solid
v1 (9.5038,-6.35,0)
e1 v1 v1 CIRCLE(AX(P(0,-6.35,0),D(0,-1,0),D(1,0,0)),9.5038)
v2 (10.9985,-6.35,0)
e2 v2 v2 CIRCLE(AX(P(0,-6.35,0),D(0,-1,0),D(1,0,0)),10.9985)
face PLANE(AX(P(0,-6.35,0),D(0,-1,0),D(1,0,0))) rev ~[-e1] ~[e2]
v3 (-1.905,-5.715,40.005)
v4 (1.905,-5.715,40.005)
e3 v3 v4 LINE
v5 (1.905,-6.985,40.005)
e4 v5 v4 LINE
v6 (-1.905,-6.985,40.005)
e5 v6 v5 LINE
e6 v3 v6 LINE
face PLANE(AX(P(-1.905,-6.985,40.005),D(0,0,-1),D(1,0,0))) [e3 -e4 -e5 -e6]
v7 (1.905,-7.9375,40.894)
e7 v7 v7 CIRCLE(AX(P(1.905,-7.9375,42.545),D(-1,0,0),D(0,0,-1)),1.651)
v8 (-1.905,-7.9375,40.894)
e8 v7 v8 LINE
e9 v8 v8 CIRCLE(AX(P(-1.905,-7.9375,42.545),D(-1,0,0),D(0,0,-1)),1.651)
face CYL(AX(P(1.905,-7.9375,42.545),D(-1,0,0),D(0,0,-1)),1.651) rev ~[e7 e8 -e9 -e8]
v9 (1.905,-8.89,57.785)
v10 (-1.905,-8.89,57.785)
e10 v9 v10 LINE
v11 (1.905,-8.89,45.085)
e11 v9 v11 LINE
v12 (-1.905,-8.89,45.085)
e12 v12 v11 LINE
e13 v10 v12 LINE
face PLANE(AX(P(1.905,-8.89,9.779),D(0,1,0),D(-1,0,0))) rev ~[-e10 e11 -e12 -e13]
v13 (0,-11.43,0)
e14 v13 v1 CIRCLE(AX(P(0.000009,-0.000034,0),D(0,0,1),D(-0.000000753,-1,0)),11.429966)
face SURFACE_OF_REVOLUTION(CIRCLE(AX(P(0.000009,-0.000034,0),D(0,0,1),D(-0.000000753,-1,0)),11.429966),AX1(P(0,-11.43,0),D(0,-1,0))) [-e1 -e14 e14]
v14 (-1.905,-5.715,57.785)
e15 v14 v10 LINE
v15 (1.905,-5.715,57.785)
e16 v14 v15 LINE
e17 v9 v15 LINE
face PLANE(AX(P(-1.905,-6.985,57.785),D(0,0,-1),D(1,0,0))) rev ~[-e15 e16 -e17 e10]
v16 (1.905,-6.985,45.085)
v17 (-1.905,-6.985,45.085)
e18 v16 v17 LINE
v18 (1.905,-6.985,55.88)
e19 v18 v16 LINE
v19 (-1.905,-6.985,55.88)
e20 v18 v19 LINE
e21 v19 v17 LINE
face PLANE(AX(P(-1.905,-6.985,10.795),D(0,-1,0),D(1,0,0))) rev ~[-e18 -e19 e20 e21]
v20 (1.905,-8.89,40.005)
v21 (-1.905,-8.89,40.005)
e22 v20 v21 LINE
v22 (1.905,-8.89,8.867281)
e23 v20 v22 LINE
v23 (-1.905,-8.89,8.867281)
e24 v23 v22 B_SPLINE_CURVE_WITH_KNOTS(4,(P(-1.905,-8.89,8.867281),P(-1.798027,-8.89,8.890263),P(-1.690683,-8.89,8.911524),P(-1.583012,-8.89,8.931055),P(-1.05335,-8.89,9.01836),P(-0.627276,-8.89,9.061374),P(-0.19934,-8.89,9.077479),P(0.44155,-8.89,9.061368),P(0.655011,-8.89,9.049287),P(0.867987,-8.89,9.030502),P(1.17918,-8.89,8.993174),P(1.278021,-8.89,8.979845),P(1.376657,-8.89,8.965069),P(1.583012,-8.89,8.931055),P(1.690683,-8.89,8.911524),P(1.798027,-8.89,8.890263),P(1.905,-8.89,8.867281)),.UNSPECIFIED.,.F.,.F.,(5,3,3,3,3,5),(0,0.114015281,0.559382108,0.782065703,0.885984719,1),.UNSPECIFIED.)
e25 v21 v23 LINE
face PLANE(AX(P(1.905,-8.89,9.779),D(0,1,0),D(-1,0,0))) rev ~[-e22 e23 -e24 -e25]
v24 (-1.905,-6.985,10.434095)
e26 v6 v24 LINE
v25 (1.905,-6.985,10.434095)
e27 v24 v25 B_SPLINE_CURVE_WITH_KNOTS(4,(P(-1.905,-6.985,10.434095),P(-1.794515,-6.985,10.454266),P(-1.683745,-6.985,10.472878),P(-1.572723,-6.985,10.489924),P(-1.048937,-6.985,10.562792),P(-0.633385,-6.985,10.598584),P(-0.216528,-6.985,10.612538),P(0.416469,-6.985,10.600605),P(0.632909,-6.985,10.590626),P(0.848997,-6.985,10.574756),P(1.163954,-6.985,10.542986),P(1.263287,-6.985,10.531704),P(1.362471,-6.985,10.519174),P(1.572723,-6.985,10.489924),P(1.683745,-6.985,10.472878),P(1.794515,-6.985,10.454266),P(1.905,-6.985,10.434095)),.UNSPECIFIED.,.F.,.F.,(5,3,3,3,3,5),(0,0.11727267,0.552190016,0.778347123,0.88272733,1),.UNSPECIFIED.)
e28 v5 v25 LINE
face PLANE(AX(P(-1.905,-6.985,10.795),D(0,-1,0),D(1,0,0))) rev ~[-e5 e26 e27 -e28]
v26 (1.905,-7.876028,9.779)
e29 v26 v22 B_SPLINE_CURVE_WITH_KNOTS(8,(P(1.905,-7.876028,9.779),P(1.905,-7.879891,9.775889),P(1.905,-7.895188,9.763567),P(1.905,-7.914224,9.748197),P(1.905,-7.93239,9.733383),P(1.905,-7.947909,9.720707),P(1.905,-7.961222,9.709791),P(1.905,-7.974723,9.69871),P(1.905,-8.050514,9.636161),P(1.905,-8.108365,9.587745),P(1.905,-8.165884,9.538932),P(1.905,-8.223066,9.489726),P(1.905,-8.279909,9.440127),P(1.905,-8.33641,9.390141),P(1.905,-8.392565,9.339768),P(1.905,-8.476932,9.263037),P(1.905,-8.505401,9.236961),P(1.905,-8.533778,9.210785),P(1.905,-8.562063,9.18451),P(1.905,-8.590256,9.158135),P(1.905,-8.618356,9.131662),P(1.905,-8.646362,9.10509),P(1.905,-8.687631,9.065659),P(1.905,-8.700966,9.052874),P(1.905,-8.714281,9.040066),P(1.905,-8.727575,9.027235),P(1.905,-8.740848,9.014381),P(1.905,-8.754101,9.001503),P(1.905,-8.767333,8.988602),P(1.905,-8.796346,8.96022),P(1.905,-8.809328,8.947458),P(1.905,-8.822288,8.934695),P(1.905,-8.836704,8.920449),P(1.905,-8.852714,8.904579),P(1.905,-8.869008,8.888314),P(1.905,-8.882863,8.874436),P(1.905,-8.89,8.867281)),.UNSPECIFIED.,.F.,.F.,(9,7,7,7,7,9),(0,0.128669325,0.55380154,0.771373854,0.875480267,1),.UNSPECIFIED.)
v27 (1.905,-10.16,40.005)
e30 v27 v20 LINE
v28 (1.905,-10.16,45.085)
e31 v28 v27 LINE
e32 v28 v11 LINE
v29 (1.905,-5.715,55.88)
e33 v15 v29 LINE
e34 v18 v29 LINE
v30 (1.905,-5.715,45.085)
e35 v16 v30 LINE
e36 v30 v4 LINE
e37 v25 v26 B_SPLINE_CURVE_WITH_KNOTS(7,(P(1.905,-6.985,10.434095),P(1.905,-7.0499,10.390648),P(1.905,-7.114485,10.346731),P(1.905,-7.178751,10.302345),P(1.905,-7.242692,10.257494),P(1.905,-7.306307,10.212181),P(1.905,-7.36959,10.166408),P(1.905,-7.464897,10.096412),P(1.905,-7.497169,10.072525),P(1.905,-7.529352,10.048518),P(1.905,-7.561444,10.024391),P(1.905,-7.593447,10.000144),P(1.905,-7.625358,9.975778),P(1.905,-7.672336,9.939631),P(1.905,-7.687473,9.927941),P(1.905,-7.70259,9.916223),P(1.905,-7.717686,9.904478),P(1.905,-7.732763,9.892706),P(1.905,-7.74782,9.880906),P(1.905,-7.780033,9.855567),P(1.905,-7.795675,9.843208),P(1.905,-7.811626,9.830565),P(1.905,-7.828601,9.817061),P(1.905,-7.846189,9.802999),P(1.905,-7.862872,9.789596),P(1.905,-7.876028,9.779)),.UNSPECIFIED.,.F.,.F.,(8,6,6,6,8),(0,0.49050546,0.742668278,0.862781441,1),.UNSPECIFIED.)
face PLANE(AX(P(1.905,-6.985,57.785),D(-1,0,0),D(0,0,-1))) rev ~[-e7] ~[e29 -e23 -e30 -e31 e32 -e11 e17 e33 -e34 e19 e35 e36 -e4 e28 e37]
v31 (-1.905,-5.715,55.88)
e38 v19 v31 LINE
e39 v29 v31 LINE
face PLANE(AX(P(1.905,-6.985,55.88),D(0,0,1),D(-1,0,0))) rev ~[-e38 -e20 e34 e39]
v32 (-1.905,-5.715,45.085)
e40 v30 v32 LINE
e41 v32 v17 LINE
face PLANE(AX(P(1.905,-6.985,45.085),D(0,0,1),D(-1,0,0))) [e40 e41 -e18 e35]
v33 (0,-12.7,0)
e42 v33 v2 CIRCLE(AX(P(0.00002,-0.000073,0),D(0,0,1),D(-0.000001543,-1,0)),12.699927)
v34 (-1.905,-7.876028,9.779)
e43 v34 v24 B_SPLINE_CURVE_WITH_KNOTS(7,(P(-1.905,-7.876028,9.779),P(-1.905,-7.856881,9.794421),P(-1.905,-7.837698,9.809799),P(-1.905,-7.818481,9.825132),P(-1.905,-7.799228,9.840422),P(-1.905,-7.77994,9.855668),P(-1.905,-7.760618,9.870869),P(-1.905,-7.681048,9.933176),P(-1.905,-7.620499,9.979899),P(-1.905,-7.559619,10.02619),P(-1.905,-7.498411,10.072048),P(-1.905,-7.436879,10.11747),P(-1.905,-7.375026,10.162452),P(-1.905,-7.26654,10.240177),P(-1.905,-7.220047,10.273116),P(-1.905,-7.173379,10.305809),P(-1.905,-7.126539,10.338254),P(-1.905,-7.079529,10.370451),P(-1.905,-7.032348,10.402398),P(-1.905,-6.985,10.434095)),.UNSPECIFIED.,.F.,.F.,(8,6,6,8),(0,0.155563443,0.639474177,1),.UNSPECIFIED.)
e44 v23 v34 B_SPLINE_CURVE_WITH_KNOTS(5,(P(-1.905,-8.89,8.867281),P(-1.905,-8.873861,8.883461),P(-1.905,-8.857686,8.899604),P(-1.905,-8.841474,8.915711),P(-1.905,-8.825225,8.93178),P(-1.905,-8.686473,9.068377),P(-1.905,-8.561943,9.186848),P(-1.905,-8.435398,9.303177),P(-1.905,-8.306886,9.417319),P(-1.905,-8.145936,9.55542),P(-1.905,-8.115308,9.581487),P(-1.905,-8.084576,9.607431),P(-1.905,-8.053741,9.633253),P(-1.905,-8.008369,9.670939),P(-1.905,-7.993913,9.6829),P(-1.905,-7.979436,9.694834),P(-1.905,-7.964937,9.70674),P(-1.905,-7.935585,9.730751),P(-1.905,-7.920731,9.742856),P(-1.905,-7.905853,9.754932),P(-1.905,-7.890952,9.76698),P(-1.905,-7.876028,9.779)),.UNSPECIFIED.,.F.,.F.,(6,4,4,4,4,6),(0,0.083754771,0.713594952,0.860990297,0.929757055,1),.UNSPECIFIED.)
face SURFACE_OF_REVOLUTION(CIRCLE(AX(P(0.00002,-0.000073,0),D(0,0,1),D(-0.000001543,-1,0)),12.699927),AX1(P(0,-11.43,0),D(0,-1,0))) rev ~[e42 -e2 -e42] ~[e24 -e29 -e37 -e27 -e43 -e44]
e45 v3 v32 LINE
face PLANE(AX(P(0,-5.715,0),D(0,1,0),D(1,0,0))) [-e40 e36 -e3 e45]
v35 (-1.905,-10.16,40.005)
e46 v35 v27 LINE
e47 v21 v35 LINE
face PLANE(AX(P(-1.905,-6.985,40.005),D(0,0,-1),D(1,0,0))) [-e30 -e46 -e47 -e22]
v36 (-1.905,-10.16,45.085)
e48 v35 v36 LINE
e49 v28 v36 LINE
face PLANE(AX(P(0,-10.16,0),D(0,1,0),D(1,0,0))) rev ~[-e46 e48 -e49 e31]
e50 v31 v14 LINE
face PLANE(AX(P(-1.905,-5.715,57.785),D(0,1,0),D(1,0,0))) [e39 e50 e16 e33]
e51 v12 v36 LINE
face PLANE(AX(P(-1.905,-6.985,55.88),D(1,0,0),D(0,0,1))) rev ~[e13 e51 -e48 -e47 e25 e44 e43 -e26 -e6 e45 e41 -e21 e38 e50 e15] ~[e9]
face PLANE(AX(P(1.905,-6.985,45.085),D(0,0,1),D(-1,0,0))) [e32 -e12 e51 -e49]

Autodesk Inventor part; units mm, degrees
ref_plane "YZ Plane" through (0, 0, 0) normal (1, 0, 0) x (0, 1, 0)
ref_plane "XZ Plane" through (0, 0, 0) normal (0, 1, 0) x (-1, 0, 0)
sketch "Sketch2" plane through (0, 0, 0) normal (0, 0, 1) x (1, 0, 0)
  arc A0 (0, -12.7) -> (10.9985, -6.35) centre (0, 0) ccw
  arc A1 (0, -11.43) -> (9.5038, -6.35) centre (0, 0) ccw
  line L0 (0, -11.43) -> (0, -12.7)
  line L1 (10.9985, -6.35) -> (9.5038, -6.35)
  dimension "d4" = 25.4
  dimension "d5" = 22.86
  dimension "d9" = 6.35
  dimension "d10" = 10.9985
revolve "Revolution1" add sketch "Sketch2" angle 360 about axis through (0, -11.43, 0) along (0, -1, 0)
ref_plane "Work Plane1" through (0, 0, 10.795) normal (0, 0, 1) x (1, 0, 0)
sketch "Sketch3" plane through (0, 0, 10.795) normal (0, 0, 1) x (1, 0, 0)
  line L0 (-1.905, -6.985) -> (1.905, -6.985)
  line L1 (1.905, -6.985) -> (1.905, -8.89)
  line L2 (1.905, -8.89) -> (-1.905, -8.89)
  line L3 (-1.905, -8.89) -> (-1.905, -6.985)
  line L4 (-10.9985, -6.35) -> (10.9985, -6.35) projected
  point P0 (0, 0)
  dimension "d12" = 1.905
  dimension "d13" = 1.905
  dimension "d14" = 1.905
  dimension "d15" = 0.635
extrude "Extrusion1" add sketch "Sketch3" along normal blind 46.99
sketch "Sketch4" plane through (0, 0, 10.795) normal (0, 0, -1) x (-1, 0, 0)
  line L0 (1.905, -6.985) -> (-1.905, -6.985) projected
  line L1 (-1.905, -6.985) -> (-1.905, -8.89) projected
  line L2 (-1.905, -8.89) -> (1.905, -8.89) projected
  line L3 (1.905, -8.89) -> (1.905, -6.985) projected
  point P0 (0, 0)
extrude "Extrusion2" add sketch "Sketch4" along normal blind 1.016
sketch "Sketch5" plane through (0, 0, 9.779) normal (0, 0, -1) x (-1, 0, 0)
  line L0 (-1.905, -8.89) -> (1.905, -8.89)
  line L1 (1.905, -8.89) -> (1.905, -7.876)
  line L2 (1.905, -7.876) -> (-1.905, -7.876)
  line L3 (-1.905, -7.876) -> (-1.905, -8.89)
  point P0 (0, 0)
extrude "Extrusion3" add sketch "Sketch5" along normal blind 1.016
sketch "Sketch6" plane through (1.905, -8.89, 57.785) normal (1, 0, 0) x (0, 0, -1)
  line L0 (0, 1.905) -> (47.3509, 1.905) projected
  line L1 (0, 0) -> (0, 1.905) projected
  point P0 (57.785, 8.89)
  point P1 (15.24, 0.9525)
  dimension "d24" = 0.9525
  dimension "d25" = 15.24
sketch "Sketch7" plane through (0, -6.985, 0) normal (0, 1, 0) x (1, 0, 0)
  line L0 (1.905, -57.785) -> (1.905, -8.8673) projected
  line L1 (-1.905, -10.4341) -> (-1.905, -57.785) projected
  line L2 (1.905, -45.085) -> (-1.905, -45.085)
  line L3 (-1.905, -45.085) -> (-1.905, -40.005)
  line L4 (-1.905, -40.005) -> (1.905, -40.005)
  line L5 (1.905, -40.005) -> (1.905, -45.085)
  line L6 (-9.5339, -42.545) -> (17.5873, -42.545) construction
  line L7 (1.905, -57.785) -> (-1.905, -57.785) construction
  point P0 (0, 0)
  dimension "d26" = 15.24
  dimension "d27" = 2.54
  dimension "d28" = 2.54
extrude "Extrusion4" add sketch "Sketch7" along normal blind 1.27 and the other way blind 3.175
hole "Hole1" at (1.905, -7.9375, 42.545) direction (-1, 0, 0) diameter 3.302 depth 25.4 tip angle 118
sketch "Sketch8" plane through (-1.905, -6.985, 57.785) normal (0, 1, 0) x (1, 0, 0)
  line L0 (3.81, 0) -> (3.81, 12.7) projected
  line L1 (0, 0) -> (3.81, 0)
  line L2 (3.81, 0) -> (3.81, 1.905)
  line L3 (3.81, 1.905) -> (0, 1.905)
  line L4 (0, 1.905) -> (0, 0)
  point P0 (1.905, 57.785)
  dimension "d40" = 1.905
extrude "Extrusion5" add sketch "Sketch8" along normal blind 1.27
properties part number "000205"
